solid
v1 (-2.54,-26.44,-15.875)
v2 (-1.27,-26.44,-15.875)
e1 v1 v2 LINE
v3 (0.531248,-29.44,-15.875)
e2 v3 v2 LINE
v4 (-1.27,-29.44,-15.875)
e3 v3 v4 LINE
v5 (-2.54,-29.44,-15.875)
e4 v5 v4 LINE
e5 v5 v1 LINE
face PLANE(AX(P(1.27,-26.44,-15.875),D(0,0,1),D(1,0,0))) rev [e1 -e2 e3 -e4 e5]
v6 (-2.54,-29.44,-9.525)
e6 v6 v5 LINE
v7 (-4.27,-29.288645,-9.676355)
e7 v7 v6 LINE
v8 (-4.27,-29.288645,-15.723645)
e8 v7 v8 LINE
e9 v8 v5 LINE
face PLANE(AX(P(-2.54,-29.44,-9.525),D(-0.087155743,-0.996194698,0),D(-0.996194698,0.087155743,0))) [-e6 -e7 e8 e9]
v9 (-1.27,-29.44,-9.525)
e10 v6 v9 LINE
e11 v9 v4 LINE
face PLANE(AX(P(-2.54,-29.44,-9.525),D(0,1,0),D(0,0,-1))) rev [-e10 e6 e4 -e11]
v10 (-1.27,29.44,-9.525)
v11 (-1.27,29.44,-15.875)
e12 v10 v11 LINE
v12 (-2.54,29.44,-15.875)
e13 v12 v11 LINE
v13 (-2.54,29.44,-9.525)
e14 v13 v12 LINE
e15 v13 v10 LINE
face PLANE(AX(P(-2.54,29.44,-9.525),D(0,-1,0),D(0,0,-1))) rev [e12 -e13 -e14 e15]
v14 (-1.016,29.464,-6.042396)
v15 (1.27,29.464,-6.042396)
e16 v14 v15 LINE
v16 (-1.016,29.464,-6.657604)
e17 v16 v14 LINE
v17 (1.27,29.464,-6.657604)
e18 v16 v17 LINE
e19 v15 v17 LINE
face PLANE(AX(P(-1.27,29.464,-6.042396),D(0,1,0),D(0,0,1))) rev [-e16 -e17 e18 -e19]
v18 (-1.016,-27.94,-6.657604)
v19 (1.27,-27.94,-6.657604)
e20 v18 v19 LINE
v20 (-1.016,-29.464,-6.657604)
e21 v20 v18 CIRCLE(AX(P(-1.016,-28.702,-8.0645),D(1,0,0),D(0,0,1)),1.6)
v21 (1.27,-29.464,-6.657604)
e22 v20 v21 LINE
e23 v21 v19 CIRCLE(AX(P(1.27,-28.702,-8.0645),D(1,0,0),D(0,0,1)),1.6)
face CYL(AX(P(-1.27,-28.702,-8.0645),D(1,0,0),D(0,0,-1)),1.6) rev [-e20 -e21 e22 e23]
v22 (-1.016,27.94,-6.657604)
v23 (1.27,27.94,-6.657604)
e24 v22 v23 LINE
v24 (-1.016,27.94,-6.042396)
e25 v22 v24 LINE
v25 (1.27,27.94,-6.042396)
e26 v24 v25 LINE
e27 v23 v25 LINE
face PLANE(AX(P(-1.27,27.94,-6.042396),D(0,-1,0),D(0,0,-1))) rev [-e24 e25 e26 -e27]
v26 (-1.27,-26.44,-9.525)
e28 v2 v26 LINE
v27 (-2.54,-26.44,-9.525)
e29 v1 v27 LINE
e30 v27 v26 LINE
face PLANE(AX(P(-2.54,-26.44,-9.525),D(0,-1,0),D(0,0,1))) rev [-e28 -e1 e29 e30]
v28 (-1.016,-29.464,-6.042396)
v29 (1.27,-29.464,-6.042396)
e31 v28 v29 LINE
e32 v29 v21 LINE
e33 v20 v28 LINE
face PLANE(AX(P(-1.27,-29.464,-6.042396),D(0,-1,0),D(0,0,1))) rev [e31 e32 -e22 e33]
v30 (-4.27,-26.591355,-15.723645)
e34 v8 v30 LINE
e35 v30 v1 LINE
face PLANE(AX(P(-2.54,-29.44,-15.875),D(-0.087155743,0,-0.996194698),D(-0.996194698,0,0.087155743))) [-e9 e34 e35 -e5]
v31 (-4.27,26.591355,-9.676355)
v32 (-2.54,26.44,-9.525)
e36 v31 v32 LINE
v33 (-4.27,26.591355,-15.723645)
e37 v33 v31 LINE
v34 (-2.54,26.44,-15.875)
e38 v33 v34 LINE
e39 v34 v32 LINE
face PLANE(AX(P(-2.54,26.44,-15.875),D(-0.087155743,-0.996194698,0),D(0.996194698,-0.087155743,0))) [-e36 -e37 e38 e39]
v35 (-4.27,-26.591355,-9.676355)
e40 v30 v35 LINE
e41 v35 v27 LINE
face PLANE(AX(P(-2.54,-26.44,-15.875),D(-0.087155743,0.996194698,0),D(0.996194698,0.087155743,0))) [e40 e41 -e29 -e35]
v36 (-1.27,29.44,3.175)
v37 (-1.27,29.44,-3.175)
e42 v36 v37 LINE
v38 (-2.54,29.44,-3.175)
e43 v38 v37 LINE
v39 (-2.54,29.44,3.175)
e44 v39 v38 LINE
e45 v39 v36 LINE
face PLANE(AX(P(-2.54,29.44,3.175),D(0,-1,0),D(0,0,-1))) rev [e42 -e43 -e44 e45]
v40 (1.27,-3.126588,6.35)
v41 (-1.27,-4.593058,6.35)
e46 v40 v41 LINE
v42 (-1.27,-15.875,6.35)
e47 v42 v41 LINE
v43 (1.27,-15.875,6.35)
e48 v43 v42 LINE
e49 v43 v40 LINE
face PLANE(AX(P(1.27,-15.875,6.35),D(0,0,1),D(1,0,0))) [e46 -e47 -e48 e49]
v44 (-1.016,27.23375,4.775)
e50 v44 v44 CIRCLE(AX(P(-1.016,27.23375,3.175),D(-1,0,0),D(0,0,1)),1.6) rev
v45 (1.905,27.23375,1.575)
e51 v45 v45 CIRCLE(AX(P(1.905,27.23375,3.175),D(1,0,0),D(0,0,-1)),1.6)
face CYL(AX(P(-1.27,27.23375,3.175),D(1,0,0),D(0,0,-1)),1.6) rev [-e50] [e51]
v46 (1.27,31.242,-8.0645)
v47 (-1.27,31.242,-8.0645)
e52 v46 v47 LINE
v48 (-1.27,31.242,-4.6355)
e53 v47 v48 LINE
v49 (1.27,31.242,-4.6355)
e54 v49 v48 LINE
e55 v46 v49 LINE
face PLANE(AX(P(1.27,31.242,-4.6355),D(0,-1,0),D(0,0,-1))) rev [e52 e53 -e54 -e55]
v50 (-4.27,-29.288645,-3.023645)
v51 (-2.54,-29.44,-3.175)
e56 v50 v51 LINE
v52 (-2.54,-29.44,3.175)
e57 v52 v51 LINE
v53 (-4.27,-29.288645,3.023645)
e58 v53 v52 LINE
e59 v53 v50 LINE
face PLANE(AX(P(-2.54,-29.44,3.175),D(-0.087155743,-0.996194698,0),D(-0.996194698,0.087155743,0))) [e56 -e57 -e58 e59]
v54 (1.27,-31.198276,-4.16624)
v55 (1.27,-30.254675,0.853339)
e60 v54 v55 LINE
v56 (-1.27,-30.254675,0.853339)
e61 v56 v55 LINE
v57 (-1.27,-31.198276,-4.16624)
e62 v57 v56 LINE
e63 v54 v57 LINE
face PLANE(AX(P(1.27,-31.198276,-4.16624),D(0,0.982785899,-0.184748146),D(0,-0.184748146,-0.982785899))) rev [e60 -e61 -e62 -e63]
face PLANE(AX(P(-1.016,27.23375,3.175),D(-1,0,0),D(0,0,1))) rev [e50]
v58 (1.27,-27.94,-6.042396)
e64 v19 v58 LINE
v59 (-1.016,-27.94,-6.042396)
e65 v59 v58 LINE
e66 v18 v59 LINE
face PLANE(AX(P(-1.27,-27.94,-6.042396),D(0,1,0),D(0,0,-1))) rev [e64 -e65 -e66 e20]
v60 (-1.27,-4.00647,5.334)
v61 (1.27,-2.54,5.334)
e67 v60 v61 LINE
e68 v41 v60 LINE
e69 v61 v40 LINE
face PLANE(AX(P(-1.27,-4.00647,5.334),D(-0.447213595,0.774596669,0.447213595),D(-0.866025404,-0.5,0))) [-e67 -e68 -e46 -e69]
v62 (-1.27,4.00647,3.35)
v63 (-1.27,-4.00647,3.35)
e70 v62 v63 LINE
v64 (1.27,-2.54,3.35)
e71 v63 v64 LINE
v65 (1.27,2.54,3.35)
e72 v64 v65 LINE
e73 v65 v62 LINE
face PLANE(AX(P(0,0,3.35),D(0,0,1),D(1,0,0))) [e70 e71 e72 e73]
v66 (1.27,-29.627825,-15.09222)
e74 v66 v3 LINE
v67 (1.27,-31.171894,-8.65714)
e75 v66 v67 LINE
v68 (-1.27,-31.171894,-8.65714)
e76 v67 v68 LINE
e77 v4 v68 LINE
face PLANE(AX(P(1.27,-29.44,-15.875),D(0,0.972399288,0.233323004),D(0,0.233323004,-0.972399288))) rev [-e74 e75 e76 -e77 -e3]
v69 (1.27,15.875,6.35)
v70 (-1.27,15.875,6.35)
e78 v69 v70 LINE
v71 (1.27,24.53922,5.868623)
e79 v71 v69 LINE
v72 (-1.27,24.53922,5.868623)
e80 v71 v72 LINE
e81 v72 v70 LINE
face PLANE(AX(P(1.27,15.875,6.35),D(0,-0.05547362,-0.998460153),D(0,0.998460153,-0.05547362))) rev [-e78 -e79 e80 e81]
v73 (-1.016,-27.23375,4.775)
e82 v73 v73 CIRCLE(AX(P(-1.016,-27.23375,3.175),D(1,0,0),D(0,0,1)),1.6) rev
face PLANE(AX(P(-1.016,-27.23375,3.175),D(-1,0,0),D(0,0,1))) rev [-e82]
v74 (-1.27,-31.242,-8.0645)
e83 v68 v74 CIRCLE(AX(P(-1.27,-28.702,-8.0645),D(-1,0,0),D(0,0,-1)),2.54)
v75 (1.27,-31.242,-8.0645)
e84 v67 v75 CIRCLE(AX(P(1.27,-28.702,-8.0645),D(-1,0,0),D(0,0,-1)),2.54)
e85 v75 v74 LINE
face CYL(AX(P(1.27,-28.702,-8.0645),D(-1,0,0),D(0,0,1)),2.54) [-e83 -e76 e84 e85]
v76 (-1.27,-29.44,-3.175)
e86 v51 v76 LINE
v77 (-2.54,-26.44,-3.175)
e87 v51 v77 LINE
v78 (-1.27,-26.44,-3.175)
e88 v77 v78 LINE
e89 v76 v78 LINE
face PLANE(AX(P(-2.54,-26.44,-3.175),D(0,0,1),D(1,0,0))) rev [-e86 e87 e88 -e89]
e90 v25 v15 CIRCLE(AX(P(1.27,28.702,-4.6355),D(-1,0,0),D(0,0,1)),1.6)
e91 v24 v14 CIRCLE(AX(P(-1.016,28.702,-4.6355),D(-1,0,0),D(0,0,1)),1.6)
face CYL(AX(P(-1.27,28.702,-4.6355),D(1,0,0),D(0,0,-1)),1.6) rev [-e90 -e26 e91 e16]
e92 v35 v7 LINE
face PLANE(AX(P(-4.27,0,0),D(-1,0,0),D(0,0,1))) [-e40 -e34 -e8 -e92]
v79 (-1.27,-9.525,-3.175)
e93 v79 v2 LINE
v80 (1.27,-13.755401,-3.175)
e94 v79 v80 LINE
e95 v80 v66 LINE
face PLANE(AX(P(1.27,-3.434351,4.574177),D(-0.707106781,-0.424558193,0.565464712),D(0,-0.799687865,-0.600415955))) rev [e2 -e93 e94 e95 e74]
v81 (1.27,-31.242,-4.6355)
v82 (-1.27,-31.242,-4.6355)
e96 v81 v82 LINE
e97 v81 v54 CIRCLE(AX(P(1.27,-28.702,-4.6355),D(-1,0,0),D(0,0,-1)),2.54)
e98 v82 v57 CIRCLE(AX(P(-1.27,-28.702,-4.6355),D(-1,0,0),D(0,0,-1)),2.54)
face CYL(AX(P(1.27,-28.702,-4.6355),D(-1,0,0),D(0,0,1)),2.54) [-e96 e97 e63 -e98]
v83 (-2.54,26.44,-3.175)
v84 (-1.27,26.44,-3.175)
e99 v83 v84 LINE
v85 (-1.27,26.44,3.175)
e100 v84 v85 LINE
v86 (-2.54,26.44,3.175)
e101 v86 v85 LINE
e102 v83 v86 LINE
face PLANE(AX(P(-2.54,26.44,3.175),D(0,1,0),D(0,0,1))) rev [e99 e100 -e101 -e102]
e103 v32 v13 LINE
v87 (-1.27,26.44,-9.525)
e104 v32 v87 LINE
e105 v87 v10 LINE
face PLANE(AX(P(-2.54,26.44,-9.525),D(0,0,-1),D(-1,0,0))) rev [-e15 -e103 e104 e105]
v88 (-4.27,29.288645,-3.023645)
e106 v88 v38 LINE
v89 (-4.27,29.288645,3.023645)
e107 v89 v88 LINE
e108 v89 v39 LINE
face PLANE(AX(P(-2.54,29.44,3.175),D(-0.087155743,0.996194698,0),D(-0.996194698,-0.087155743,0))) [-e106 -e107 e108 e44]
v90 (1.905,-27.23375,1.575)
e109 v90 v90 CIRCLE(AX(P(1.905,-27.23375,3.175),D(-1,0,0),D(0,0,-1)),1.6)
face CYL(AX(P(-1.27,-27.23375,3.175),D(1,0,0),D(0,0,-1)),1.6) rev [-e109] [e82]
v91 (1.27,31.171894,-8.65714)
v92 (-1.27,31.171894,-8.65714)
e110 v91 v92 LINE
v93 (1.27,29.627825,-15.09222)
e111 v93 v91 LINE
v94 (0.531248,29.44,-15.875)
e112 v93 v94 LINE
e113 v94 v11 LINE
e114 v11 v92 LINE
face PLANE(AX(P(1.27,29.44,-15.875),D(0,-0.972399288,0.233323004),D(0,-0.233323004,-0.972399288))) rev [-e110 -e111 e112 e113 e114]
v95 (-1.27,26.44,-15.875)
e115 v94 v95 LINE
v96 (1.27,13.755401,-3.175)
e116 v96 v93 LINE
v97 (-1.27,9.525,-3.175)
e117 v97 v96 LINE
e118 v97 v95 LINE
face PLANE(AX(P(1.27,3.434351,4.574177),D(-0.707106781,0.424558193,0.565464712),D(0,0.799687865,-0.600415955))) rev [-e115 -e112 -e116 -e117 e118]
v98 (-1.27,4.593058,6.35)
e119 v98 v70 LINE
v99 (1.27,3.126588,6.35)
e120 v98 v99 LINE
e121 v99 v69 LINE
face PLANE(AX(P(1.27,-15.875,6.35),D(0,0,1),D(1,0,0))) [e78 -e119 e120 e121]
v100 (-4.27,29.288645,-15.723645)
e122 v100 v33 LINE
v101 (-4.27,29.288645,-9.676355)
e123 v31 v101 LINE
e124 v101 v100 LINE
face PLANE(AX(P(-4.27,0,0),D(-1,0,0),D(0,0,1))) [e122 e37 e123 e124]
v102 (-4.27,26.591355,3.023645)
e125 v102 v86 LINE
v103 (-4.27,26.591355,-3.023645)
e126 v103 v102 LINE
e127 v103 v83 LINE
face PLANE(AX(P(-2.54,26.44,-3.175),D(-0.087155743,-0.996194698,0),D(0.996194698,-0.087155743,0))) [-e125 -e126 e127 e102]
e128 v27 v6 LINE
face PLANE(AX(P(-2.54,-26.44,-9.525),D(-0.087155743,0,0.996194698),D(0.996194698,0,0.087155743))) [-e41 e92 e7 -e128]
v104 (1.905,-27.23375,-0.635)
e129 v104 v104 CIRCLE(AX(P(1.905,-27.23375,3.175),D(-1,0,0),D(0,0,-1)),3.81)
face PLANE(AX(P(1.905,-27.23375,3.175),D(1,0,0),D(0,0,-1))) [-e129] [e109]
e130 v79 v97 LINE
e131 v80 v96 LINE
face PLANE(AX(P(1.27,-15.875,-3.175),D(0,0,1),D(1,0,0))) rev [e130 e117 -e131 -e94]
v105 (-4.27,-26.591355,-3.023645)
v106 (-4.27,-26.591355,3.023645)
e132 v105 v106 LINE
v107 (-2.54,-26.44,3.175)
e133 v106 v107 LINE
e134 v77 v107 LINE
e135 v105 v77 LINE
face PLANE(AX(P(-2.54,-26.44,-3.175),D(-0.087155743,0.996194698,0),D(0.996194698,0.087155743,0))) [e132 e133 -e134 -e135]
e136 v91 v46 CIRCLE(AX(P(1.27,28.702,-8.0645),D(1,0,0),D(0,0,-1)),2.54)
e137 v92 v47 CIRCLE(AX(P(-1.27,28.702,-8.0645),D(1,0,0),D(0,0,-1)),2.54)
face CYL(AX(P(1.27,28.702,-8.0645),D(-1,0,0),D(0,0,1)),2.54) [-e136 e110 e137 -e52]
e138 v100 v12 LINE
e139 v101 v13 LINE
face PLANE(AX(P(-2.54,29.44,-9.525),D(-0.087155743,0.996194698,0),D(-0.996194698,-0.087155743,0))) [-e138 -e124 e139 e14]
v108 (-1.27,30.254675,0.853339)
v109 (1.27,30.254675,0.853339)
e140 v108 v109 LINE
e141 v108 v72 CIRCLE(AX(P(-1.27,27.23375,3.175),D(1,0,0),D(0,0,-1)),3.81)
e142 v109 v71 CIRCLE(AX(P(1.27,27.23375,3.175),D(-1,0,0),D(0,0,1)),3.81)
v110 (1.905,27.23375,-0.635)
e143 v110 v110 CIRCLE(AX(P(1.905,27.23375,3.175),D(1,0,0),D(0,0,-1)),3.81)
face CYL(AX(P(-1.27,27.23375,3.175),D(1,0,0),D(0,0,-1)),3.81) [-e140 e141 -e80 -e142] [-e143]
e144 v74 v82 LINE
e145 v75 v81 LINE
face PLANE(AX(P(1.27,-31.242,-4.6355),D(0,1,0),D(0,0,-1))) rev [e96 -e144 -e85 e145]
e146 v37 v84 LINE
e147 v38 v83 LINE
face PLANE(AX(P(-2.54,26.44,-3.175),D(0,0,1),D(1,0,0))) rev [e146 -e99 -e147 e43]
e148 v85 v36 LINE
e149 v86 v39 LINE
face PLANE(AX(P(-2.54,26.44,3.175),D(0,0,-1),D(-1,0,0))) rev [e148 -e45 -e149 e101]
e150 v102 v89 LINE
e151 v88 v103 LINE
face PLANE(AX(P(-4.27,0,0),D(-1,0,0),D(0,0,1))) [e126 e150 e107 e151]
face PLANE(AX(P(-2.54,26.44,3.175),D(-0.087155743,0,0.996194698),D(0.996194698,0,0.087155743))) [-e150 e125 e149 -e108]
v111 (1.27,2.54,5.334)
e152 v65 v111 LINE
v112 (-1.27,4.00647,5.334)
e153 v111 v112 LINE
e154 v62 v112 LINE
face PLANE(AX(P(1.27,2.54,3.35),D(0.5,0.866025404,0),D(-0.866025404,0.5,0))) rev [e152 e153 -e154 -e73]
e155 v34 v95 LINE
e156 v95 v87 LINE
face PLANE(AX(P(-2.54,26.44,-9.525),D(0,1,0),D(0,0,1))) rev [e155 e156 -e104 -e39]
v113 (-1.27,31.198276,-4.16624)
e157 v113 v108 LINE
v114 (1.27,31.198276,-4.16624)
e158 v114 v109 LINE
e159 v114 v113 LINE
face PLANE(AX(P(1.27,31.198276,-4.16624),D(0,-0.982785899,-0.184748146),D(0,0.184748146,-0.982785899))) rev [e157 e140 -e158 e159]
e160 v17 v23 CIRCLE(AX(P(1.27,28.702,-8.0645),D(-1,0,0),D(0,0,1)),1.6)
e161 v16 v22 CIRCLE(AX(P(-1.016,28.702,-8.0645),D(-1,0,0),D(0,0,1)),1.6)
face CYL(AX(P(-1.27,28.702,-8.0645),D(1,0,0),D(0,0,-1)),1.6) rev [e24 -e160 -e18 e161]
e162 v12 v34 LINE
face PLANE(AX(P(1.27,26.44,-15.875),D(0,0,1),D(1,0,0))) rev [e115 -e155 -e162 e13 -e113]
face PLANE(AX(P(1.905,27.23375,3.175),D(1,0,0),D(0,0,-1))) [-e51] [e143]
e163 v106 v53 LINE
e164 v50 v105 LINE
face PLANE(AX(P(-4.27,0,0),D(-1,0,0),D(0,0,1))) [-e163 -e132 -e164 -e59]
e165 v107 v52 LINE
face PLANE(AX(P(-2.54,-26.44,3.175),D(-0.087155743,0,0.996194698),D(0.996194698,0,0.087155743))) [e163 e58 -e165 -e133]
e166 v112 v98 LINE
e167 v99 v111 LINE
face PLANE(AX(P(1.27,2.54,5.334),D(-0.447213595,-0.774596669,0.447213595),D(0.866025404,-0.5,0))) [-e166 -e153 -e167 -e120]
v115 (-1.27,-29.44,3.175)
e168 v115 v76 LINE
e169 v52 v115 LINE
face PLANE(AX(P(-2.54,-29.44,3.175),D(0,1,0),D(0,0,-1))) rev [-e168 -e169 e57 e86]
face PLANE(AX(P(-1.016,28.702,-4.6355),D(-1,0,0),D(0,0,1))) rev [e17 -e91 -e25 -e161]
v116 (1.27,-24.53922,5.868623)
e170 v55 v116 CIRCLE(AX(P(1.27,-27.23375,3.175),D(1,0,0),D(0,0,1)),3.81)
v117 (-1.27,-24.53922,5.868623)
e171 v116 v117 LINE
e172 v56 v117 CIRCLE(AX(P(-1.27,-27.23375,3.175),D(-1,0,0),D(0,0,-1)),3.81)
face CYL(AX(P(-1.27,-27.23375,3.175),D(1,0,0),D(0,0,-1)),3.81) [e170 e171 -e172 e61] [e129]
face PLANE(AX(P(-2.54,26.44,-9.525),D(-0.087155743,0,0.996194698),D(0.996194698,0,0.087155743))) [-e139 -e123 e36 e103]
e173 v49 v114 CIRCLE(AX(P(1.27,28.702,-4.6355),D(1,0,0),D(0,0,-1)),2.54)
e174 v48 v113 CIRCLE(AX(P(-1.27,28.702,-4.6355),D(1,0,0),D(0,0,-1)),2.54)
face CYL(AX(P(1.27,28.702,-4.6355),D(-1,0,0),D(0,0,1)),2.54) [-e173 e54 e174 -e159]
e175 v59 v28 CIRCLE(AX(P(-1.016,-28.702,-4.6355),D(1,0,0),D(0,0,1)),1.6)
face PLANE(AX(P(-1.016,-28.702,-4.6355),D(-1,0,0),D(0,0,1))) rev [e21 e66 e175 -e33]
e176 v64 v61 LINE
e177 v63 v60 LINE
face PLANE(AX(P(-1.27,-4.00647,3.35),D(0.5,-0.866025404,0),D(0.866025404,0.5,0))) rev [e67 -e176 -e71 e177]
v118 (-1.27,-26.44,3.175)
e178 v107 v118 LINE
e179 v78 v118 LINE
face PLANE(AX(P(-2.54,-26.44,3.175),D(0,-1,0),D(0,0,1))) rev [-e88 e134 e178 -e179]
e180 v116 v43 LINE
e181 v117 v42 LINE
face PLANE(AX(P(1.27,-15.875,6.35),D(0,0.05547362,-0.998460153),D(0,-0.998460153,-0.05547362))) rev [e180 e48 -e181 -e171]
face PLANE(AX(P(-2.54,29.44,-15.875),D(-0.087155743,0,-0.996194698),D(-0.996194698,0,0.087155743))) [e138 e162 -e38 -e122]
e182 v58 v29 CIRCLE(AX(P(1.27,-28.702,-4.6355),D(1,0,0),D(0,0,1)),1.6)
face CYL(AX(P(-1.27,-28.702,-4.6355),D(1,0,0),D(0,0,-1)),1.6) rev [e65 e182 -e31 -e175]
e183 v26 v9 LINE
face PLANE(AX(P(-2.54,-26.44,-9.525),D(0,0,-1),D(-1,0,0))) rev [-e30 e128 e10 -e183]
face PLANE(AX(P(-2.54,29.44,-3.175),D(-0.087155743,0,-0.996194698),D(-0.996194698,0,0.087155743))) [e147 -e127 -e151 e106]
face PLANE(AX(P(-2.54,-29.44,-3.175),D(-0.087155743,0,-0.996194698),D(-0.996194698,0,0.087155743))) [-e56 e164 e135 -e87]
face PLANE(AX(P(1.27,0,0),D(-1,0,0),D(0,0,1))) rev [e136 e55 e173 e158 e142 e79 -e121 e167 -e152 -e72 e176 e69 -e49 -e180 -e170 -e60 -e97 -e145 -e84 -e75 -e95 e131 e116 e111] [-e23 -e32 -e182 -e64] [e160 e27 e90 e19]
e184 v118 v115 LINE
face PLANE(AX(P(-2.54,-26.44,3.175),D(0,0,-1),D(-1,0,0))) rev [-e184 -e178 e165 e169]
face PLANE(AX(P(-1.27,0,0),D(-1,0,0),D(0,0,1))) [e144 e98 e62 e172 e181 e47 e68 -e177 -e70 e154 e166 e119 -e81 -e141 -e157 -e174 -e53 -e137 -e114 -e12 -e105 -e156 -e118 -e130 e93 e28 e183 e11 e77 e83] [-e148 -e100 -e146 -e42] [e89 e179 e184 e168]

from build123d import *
from OCP.BRepFilletAPI import BRepFilletAPI_MakeChamfer

# Parameters (mm, degrees)
DOWELSUPPORT_DEPTH       = 1.905
DOWELSUPPORT_DEPTH_BACK  = 1.27
SKETCH3_R                = 3.81
SKETCH5_W                = 9.525
SKETCH5_H                = 31.75
SLIDERDOWELSUPPORT_DEPTH = 1.27
STRINGDOWELSUPPORT_DEPTH = 1.27
SKETCH9_W                = 6.35
SKETCH9_H                = 3
TABSUPPORT_DEPTH         = 1.27
INTERSUPPORT_DEPTH       = 1.27
DOWELHOLES_DEPTH         = 36.095686544
DOWELHOLES_DEPTH_BACK    = 36.095686544
SKETCH11_R               = 1.600000102
BOSS_EXTRUDE1_START      = -1.27
SKETCH11_2_R             = 1.600000102
BOSS_EXTRUDE1_DEPTH      = 0.254
SKETCH14_W               = 6.35
SKETCH14_H               = 3
TABBASE_DEPTH            = 1.27
SKETCH15_W               = 6.35
SKETCH15_H               = 3
TABDRAFT_DEPTH           = 1.73
TABDRAFT_DRAFT           = 5
TABDRAFT_PROFILE_2_DEPTH = 1.73
TABDRAFT_PROFILE_2_DRAFT = 5
CHAMFER2_SIZE            = 2.54
CUT_EXTRUDE1_DEPTH       = 3
CHAMFER3_SIZE            = 0.508
CHAMFER3_SIZE2           = 1.016


with BuildPart() as part:
    # Sketch3 → DowelSupport (new, two sides: drawn at the far end of the back side and taken through both)
    with BuildSketch(Plane(origin=(0, 0, 0), x_dir=(0, 0, -1), z_dir=(1, 0, 0)).offset(-DOWELSUPPORT_DEPTH_BACK)):
        with Locations((-3.175, 27.23375)):
            Circle(SKETCH3_R)
    extrude(amount=DOWELSUPPORT_DEPTH + DOWELSUPPORT_DEPTH_BACK)



with BuildPart() as body_2:
    # Sketch5 → SliderDowelSupport (new, symmetric)
    with BuildSketch(Plane(origin=(0, 0, 0), x_dir=(0, 0, -1), z_dir=(1, 0, 0))):
        with Locations((-1.5875, 0)):
            Rectangle(SKETCH5_W, SKETCH5_H)
    extrude(amount=SLIDERDOWELSUPPORT_DEPTH, both=True)


with BuildPart() as body_3:
    # Sketch8 → StringDowelSupport (new, symmetric)
    with BuildSketch(Plane(origin=(0, 0, 0), x_dir=(0, 0, -1), z_dir=(1, 0, 0))):
        with BuildLine():
            Line((4.6355, 31.242), (8.0645, 31.242))
            ThreePointArc((8.0645, 31.242), (10.6045, 28.702), (8.0645, 26.162))
            Line((8.0645, 26.162), (4.6355, 26.162))
            ThreePointArc((4.6355, 26.162), (2.0955, 28.702), (4.6355, 31.242))
        make_face()
    extrude(amount=STRINGDOWELSUPPORT_DEPTH, both=True)


with BuildPart() as part_1:
    add(part.part)

    add(body_3.part)  # TabSupport merges body 3
    # Sketch9 → TabSupport (add, symmetric)
    with BuildSketch(Plane(origin=(0, 0, 0), x_dir=(0, 0, -1), z_dir=(1, 0, 0))):
        with Locations((0, 27.94)):
            Rectangle(SKETCH9_W, SKETCH9_H)
        with Locations((12.7, 27.94)):
            Rectangle(SKETCH9_W, SKETCH9_H)
    extrude(amount=TABSUPPORT_DEPTH, both=True)


    add(body_2.part)  # InterSupport merges body 2
    # Sketch10 → InterSupport (add, symmetric)
    with BuildSketch(Plane(origin=(0, 0, 0), x_dir=(0, 0, -1), z_dir=(1, 0, 0))):
        Polygon((-6.35, 15.875), (-5.711088789, 27.374652996), (-3.644260291, 29.730026182), (4.166239709, 31.198276182), (8.657140431, 31.171894192), (15.875, 29.44), (15.875, 26.44), (3.175, 9.525), (3.175, 15.875), align=None)
    extrude(amount=INTERSUPPORT_DEPTH, both=True)

    # Sketch11 → DowelHoles (cut, two sides: drawn at the far end of the back side and taken through both)
    with BuildSketch(Plane(origin=(0, 0, 0), x_dir=(0, 0, -1), z_dir=(1, 0, 0)).offset(-DOWELHOLES_DEPTH_BACK)):
        with Locations((-3.175, 27.23375)):
            Circle(SKETCH11_R)
        with BuildLine():
            Line((6.04239599, 27.94), (6.65760401, 27.94))
            ThreePointArc((6.65760401, 27.94), (9.664500102, 28.702), (6.65760401, 29.464))
            Line((6.65760401, 29.464), (6.04239599, 29.464))
            ThreePointArc((6.04239599, 29.464), (3.035499898, 28.702), (6.04239599, 27.94))
        make_face()
    extrude(amount=DOWELHOLES_DEPTH + DOWELHOLES_DEPTH_BACK, mode=Mode.SUBTRACT)

    # Sketch11<2> → Boss-Extrude1 (add)
    with BuildSketch(Plane(origin=(0, 0, 0), x_dir=(0, 0, -1), z_dir=(1, 0, 0)).offset(BOSS_EXTRUDE1_START)):
        with BuildLine():
            Line((6.04239599, 27.94), (6.65760401, 27.94))
            ThreePointArc((6.65760401, 27.94), (9.664500102, 28.702), (6.65760401, 29.464))
            Line((6.65760401, 29.464), (6.04239599, 29.464))
            ThreePointArc((6.04239599, 29.464), (3.035499898, 28.702), (6.04239599, 27.94))
        make_face()
        with Locations((-3.175, 27.23375)):
            Circle(SKETCH11_2_R)
    extrude(amount=BOSS_EXTRUDE1_DEPTH)

    # Sketch14 → TabBase (add)
    with BuildSketch(Plane.ZY.offset(1.27)):
        with Locations((-12.7, 27.94)):
            Rectangle(SKETCH14_W, SKETCH14_H)
        with Locations((0, 27.94)):
            Rectangle(SKETCH14_W, SKETCH14_H)
    extrude(amount=TABBASE_DEPTH)


with BuildPart() as tabdraft_tool:
    # Sketch15 → TabDraft (with draft: the straight prism first)
    with BuildSketch(Plane.ZY.offset(2.54)):
        with Locations((0, 27.94)):
            Rectangle(SKETCH15_W, SKETCH15_H)
    extrude(amount=TABDRAFT_DEPTH)
    # TabDraft: the draft: its side faces are tilted about the plane it starts from
    tabdraft_sides = [tabdraft_tool.faces().sort_by_distance(p)[0] for p in [
        (-3.405, 27.94, -3.175),
        (-3.405, 26.44, 0),
        (-3.405, 27.94, 3.175),
        (-3.405, 29.44, 0),
    ]]
    draft(tabdraft_sides, Plane.ZY.offset(2.54), TABDRAFT_DRAFT)


with BuildPart() as part_2:
    add(part_1.part)

    # TabDraft: add tabdraft_tool
    add(tabdraft_tool.part)


with BuildPart() as tabdraft_profile_2_tool:
    # Sketch15 → TabDraft profile 2 (with draft: the straight prism first)
    with BuildSketch(Plane.ZY.offset(2.54)):
        with Locations((-12.7, 27.94)):
            Rectangle(SKETCH15_W, SKETCH15_H)
    extrude(amount=TABDRAFT_PROFILE_2_DEPTH)
    # TabDraft profile 2: the draft: its side faces are tilted about the plane it starts from
    tabdraft_profile_2_sides = [tabdraft_profile_2_tool.faces().sort_by_distance(p)[0] for p in [
        (-3.405, 27.94, -15.875),
        (-3.405, 26.44, -12.7),
        (-3.405, 27.94, -9.525),
        (-3.405, 29.44, -12.7),
    ]]
    draft(tabdraft_profile_2_sides, Plane.ZY.offset(2.54), TABDRAFT_PROFILE_2_DRAFT)


with BuildPart() as part_3:
    add(part_2.part)

    # TabDraft profile 2: add tabdraft_profile_2_tool
    add(tabdraft_profile_2_tool.part)

    # Chamfer2
    chamfer2_edges = [part_3.edges().sort_by_distance(p)[0] for p in [
        (1.27, 17.9825, -9.525),
    ]]
    chamfer(chamfer2_edges, length=CHAMFER2_SIZE - 0.0001)  # a hair under: the kernel refuses the full size

    # Mirror1: part across plane


with BuildPart() as part_4:
    add(part_3.part)
    add(part_3.part.mirror(Plane.ZX))

    # Sketch16 → Cut-Extrude1 (cut)
    with BuildSketch(Plane.XY.offset(6.35)):
        Polygon((-1.27, 4.006469684), (-1.27, -4.006469684), (1.27, -2.54), (1.27, 2.54), align=None)
    extrude(amount=-CUT_EXTRUDE1_DEPTH, mode=Mode.SUBTRACT)

    # Chamfer3: one chamfer whose edges measure the first distance from different faces: ONE call of the kernel's chamfer builder (chamfer() names one face for all edges)
    chamfer3_edges_1 = [part_4.edges().sort_by_distance(p)[0] for p in [
        (0, 3.273234842, 6.35),
    ]]
    chamfer3_side_1 = [part_4.faces().sort_by_distance(p)[0] for p in [
        (0.024631688, 9.567006865, 6.35),
    ]]
    chamfer3_edges_2 = [part_4.edges().sort_by_distance(p)[0] for p in [
        (0, -3.273234842, 6.35),
    ]]
    chamfer3_side_2 = [part_4.faces().sort_by_distance(p)[0] for p in [
        (0.024631688, -9.567006865, 6.35),
    ]]
    chamfer3 = BRepFilletAPI_MakeChamfer(part_4.part.solid().wrapped)
    for e in chamfer3_edges_1:
        chamfer3.Add(CHAMFER3_SIZE, CHAMFER3_SIZE2, e.wrapped, chamfer3_side_1[0].wrapped)  # the first distance lies on this face
    for e in chamfer3_edges_2:
        chamfer3.Add(CHAMFER3_SIZE, CHAMFER3_SIZE2, e.wrapped, chamfer3_side_2[0].wrapped)  # the first distance lies on this face
    add(Compound.cast(chamfer3.Shape()), mode=Mode.REPLACE)


solid = part_4.part
